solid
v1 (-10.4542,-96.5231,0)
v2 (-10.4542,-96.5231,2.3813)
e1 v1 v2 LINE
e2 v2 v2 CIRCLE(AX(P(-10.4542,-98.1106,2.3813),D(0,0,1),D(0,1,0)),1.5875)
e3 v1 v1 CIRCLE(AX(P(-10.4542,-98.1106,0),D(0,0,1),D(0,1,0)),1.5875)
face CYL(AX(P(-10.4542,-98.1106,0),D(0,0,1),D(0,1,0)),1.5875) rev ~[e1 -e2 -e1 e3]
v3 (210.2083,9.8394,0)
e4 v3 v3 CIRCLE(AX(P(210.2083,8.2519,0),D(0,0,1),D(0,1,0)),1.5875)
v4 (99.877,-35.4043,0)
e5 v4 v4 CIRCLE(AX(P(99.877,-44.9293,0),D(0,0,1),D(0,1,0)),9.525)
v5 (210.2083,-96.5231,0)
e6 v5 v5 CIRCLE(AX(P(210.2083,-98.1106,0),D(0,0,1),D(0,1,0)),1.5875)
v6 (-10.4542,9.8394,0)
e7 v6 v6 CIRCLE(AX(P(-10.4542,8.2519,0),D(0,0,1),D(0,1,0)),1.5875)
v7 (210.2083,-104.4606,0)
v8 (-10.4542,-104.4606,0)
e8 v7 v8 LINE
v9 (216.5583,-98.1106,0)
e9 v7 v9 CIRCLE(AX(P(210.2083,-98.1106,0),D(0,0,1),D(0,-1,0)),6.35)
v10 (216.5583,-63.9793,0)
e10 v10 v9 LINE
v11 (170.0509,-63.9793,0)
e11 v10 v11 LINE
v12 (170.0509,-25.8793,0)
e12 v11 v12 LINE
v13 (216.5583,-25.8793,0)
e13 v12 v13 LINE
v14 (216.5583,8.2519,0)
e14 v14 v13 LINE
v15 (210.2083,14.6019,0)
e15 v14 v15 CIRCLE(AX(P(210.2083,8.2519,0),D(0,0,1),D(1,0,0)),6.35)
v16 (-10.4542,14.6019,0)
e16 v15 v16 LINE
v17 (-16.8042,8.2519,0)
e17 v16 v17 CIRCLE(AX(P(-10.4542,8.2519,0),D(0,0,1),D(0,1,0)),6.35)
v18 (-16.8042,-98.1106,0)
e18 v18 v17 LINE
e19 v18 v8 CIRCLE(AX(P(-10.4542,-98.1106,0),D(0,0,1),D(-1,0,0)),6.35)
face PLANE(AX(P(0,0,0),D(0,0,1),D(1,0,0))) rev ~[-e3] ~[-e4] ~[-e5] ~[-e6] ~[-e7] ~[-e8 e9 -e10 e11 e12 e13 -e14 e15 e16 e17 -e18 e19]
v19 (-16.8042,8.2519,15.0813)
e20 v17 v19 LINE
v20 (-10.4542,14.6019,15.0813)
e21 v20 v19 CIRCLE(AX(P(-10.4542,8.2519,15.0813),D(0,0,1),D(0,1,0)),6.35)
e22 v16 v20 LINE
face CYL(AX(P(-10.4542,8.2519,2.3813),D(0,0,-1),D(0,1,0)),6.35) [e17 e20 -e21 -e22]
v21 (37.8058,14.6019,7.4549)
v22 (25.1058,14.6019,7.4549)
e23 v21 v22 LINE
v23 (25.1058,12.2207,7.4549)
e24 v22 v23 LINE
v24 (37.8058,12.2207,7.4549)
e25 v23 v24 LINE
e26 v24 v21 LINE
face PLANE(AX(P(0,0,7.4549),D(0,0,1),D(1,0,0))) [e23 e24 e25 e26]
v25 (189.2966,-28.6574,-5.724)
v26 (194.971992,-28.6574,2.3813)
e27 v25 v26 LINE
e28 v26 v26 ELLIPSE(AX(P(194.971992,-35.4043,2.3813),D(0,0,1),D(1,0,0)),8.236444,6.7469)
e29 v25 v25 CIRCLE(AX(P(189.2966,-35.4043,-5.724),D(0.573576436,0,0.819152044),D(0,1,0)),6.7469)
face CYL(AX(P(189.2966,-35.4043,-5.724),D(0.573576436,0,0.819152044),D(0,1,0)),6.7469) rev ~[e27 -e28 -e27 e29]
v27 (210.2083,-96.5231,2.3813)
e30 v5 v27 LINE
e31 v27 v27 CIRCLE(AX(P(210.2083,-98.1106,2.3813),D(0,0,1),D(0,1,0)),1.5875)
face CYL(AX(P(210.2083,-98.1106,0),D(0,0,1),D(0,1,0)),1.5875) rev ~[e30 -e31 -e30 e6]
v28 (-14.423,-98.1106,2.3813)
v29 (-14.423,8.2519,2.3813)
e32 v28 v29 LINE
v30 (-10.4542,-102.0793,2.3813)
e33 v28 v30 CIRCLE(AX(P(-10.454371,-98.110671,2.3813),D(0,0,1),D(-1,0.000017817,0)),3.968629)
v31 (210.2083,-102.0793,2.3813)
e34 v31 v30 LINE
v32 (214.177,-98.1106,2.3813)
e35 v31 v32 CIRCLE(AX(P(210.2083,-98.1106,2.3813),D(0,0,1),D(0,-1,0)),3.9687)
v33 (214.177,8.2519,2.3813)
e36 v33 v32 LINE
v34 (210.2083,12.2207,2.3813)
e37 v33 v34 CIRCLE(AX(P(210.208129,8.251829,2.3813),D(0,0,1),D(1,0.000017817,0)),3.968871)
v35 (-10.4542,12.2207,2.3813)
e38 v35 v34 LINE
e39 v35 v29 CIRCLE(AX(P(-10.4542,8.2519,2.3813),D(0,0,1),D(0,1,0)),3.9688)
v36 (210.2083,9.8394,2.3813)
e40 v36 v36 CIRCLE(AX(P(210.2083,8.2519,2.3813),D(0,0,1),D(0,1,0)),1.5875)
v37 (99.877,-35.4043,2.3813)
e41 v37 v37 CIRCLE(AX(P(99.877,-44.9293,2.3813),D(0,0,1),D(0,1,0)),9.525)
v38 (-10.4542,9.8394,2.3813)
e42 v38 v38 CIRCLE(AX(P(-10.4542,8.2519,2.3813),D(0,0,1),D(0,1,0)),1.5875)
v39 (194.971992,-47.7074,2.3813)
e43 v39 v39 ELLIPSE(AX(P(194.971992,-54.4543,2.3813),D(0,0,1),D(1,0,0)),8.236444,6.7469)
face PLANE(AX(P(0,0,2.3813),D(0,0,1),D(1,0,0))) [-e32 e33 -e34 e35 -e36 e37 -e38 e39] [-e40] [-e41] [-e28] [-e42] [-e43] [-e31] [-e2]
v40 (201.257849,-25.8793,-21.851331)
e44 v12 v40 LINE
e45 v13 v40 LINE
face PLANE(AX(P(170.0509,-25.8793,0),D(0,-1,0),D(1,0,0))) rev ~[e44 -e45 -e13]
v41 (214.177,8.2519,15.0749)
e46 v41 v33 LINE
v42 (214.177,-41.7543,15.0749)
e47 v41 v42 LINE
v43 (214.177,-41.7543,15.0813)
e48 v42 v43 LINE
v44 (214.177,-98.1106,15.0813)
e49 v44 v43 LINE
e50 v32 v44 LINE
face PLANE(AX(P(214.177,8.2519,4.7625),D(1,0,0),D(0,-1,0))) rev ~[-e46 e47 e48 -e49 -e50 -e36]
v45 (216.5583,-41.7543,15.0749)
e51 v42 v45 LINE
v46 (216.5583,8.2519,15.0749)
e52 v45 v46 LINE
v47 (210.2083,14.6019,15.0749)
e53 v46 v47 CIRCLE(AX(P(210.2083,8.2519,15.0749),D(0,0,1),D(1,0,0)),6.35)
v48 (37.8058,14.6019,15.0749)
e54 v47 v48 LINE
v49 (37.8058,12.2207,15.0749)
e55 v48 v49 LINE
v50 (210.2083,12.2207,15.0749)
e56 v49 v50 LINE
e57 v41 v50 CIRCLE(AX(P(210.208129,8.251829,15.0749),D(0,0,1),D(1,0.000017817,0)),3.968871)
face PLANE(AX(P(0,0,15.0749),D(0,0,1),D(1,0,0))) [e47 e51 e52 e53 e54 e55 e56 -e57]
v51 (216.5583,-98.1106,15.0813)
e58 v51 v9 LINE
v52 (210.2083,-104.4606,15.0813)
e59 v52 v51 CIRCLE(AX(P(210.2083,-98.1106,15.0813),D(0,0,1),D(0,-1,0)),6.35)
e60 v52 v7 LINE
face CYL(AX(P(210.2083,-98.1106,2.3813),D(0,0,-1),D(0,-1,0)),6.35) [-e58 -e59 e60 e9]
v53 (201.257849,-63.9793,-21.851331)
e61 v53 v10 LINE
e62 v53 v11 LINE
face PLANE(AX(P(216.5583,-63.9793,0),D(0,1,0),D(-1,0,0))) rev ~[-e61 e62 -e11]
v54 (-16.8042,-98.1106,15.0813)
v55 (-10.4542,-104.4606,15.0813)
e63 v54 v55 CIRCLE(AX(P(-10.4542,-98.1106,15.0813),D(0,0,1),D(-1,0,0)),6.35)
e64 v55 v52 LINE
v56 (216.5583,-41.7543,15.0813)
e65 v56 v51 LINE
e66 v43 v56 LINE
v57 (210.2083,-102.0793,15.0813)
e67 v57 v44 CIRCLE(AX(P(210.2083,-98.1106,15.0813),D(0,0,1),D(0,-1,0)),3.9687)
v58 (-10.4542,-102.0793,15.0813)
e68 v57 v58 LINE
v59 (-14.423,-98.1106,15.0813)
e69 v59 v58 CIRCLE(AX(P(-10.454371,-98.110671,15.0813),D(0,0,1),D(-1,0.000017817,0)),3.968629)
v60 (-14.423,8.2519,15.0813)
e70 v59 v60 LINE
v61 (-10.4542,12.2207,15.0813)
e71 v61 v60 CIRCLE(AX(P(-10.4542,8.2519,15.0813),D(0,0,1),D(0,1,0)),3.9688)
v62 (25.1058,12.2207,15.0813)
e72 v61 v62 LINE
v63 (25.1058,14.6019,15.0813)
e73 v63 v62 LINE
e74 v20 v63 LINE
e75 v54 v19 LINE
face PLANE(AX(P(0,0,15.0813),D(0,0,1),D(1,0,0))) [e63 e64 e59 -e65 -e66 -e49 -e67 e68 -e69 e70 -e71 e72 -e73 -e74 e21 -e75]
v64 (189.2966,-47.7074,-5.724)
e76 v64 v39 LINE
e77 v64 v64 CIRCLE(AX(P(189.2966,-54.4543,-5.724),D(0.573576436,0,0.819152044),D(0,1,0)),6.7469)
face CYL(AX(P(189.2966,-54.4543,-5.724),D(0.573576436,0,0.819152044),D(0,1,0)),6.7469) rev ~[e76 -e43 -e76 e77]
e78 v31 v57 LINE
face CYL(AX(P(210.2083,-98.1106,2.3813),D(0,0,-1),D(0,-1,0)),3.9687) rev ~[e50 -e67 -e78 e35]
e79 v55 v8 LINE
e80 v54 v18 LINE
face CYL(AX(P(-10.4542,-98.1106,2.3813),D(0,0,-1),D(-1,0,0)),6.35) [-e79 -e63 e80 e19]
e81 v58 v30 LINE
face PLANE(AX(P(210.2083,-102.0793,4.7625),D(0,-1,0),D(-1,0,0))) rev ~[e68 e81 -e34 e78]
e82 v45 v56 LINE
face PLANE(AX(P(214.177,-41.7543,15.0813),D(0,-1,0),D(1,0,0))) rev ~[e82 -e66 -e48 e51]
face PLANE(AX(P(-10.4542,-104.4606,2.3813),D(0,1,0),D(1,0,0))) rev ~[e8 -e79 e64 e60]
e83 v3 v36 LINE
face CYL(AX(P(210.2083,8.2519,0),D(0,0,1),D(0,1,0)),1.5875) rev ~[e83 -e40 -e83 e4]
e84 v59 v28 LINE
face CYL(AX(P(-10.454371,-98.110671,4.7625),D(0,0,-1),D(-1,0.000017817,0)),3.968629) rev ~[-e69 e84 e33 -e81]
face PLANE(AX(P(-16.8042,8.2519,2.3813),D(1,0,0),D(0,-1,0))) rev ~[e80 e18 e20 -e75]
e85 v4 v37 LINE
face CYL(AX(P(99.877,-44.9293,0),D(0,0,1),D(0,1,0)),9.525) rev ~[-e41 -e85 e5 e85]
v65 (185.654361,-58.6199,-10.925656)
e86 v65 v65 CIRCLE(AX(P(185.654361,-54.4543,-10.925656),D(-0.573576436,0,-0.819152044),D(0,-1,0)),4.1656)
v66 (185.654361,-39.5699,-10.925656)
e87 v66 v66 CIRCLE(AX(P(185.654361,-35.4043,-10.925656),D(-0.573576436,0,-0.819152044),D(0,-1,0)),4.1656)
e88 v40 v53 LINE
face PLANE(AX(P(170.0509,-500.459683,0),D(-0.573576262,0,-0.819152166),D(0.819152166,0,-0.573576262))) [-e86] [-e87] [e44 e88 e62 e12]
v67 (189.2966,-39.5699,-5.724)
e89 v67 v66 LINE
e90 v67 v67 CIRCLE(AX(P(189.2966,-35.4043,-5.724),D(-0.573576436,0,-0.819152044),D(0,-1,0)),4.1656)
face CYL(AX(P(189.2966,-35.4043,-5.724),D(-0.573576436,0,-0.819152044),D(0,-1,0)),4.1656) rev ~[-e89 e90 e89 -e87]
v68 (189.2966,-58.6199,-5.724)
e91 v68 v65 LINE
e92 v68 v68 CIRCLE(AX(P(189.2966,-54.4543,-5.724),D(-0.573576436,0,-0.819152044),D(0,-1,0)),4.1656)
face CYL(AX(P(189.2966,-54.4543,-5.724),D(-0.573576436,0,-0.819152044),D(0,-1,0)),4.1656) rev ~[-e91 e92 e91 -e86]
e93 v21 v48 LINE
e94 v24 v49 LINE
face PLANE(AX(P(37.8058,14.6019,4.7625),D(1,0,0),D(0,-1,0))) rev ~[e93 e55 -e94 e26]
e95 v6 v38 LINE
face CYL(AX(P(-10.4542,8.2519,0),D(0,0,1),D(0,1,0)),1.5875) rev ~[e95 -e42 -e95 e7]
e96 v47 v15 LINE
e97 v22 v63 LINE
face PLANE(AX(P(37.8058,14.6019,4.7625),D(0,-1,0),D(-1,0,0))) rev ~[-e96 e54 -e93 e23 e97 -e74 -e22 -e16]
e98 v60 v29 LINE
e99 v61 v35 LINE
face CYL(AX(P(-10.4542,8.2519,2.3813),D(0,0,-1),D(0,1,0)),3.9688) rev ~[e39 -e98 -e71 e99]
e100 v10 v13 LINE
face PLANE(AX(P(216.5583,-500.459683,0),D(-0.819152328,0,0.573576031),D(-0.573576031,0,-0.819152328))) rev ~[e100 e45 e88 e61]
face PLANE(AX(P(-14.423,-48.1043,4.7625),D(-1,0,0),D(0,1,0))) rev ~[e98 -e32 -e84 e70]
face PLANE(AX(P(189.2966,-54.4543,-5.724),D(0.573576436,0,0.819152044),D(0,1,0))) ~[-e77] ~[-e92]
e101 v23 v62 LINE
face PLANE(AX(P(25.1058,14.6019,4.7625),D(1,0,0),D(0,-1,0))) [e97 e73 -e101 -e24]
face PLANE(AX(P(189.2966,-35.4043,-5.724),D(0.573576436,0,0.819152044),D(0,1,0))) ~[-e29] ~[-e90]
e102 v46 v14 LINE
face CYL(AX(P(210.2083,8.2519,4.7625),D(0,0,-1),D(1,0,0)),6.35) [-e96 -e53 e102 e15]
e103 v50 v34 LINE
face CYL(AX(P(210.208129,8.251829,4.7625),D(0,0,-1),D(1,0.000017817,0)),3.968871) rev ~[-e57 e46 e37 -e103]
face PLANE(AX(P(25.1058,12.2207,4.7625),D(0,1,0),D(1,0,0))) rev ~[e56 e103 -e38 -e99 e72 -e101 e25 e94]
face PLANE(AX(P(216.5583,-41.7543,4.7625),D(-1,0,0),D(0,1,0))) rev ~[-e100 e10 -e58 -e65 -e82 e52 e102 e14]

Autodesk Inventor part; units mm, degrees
ref_plane "YZ Plane" through (0, 0, 0) normal (1, 0, 0) x (0, 1, 0)
ref_plane "XZ Plane" through (0, 0, 0) normal (0, 1, 0) x (-1, 0, 0)
sketch "Sketch1" plane through (0, 0, 0) normal (0, 0, 1) x (1, 0, 0)
  line L0 (-10.4542, 14.6019) -> (210.2083, 14.6019)
  line L1 (216.5583, 8.2519) -> (216.5583, -98.1106)
  line L2 (210.2083, -104.4606) -> (-10.4542, -104.4606)
  line L3 (-16.8042, -98.1106) -> (-16.8042, 8.2519)
  line L4 (99.877, 12.2207) -> (-10.4542, 12.2207)
  line L5 (-14.423, 8.2519) -> (-14.423, -44.9293)
  line L6 (99.877, 12.2207) -> (210.2083, 12.2207)
  line L7 (214.177, 8.2519) -> (214.177, -44.9293)
  line L8 (99.877, -102.0793) -> (210.2083, -102.0793)
  line L9 (214.177, -98.1106) -> (214.177, -44.9293)
  line L10 (99.877, -102.0793) -> (-10.4542, -102.0793)
  line L11 (-14.423, -98.1106) -> (-14.423, -44.9293)
  arc A0 (-10.4542, 14.6019) -> (-16.8042, 8.2519) centre (-10.4542, 8.2519) ccw
  arc A1 (216.5583, 8.2519) -> (210.2083, 14.6019) centre (210.2083, 8.2519) ccw
  arc A2 (210.2083, -104.4606) -> (216.5583, -98.1106) centre (210.2083, -98.1106) ccw
  arc A3 (-16.8042, -98.1106) -> (-10.4542, -104.4606) centre (-10.4542, -98.1106) ccw
  arc A4 (-10.4542, 12.2207) -> (-14.423, 8.2519) centre (-10.4542, 8.2519) ccw
  arc A5 (214.177, 8.2519) -> (210.2083, 12.2207) centre (210.2083, 8.2519) ccw
  arc A6 (210.2083, -102.0793) -> (214.177, -98.1106) centre (210.2083, -98.1106) ccw
  arc A7 (-14.423, -98.1106) -> (-10.4542, -102.0793) centre (-10.4542, -98.1106) ccw
  point P0 (0, 0)
  point P1 (-16.8042, 14.6019)
  point P2 (216.5583, -104.4606)
  point P3 (216.5583, 14.6019)
  point P4 (-16.8042, -104.4606)
  dimension "d0" = 233.3625
  dimension "d1" = 119.0625
  dimension "d9" = 6.35
  dimension "d10" = 3.9688
extrude "Extrusion1" add sketch "Sketch1" along normal blind 2.3813 contours L0 A1 L1 A2 L2 A3 L3 A0 | L6 A5 L7 L9 A6 L8 L10 A7 L11 L5 A4 L4
sketch "Sketch2" plane through (0, 0, 2.3813) normal (0, 0, 1) x (1, 0, 0)
  line L0 (210.2083, 14.6019) -> (-10.4542, 14.6019) projected
  arc A0 (-10.4542, 14.6019) -> (-16.8042, 8.2519) centre (-10.4542, 8.2519) ccw projected
  line L1 (-16.8042, 8.2519) -> (-16.8042, -98.1106) projected
  arc A1 (-16.8042, -98.1106) -> (-10.4542, -104.4606) centre (-10.4542, -98.1106) ccw projected
  line L2 (-10.4542, -104.4606) -> (210.2083, -104.4606) projected
  arc A2 (210.2083, -104.4606) -> (216.5583, -98.1106) centre (210.2083, -98.1106) ccw projected
  line L3 (216.5583, -98.1106) -> (216.5583, 8.2519) projected
  arc A3 (216.5583, 8.2519) -> (210.2083, 14.6019) centre (210.2083, 8.2519) ccw projected
  line L4 (99.877, 12.2207) -> (-10.4542, 12.2207)
  line L5 (-14.423, 8.2519) -> (-14.423, -44.9293)
  line L6 (99.877, -102.0793) -> (-10.4542, -102.0793)
  line L7 (-14.423, -98.1106) -> (-14.423, -44.9293)
  line L8 (99.877, -102.0793) -> (210.2083, -102.0793)
  line L9 (214.177, -98.1106) -> (214.177, -44.9293)
  line L10 (99.877, 12.2207) -> (210.2083, 12.2207)
  line L11 (214.177, 8.2519) -> (214.177, -44.9293)
  arc A4 (-10.4542, 12.2207) -> (-14.423, 8.2519) centre (-10.4542, 8.2519) ccw
  arc A5 (214.177, 8.2519) -> (210.2083, 12.2207) centre (210.2083, 8.2519) ccw
  arc A6 (210.2083, -102.0793) -> (214.177, -98.1106) centre (210.2083, -98.1106) ccw
  arc A7 (-14.423, -98.1106) -> (-10.4542, -102.0793) centre (-10.4542, -98.1106) ccw
  point P0 (0, 0)
  dimension "d15" = 3.9688
extrude "Extrusion2" add sketch "Sketch2" along normal blind 2.3813
sketch "Sketch3" plane through (0, 0, 4.7625) normal (0, 0, 1) x (1, 0, 0)
  arc A0 (-10.4542, 12.2207) -> (-14.423, 8.2519) centre (-10.4542, 8.2519) ccw projected
  arc A1 (214.177, 8.2519) -> (210.2083, 12.2207) centre (210.2083, 8.2519) ccw projected
  line L0 (214.177, 8.2519) -> (214.177, -98.1106) projected
  arc A2 (210.2083, -102.0793) -> (214.177, -98.1106) centre (210.2083, -98.1106) ccw projected
  line L1 (210.2083, -102.0793) -> (-10.4542, -102.0793) projected
  arc A3 (-14.423, -98.1106) -> (-10.4542, -102.0793) centre (-10.4542, -98.1106) ccw projected
  line L2 (-14.423, -98.1106) -> (-14.423, 8.2519) projected
  arc A4 (-10.4542, 14.6019) -> (-16.8042, 8.2519) centre (-10.4542, 8.2519) ccw projected
  line L3 (-16.8042, 8.2519) -> (-16.8042, -98.1106) projected
  arc A5 (-16.8042, -98.1106) -> (-10.4542, -104.4606) centre (-10.4542, -98.1106) ccw projected
  line L4 (-10.4542, -104.4606) -> (210.2083, -104.4606) projected
  arc A6 (210.2083, -104.4606) -> (216.5583, -98.1106) centre (210.2083, -98.1106) ccw projected
  line L5 (216.5583, -98.1106) -> (216.5583, 8.2519) projected
  arc A7 (216.5583, 8.2519) -> (210.2083, 14.6019) centre (210.2083, 8.2519) ccw projected
  line L6 (214.177, -44.9293) -> (214.177, -41.7543)
  line L7 (214.177, -41.7543) -> (216.5583, -41.7543)
  line L8 (216.5583, -41.7543) -> (216.5583, -44.9293)
  line L9 (216.5583, -44.9293) -> (216.5583, -48.1043)
  line L10 (216.5583, -48.1043) -> (214.177, -48.1043)
  line L11 (214.177, -48.1043) -> (214.177, -44.9293)
  line L12 (-14.423, -44.9293) -> (-14.423, -41.7543)
  line L13 (-14.423, -41.7543) -> (-16.8042, -41.7543)
  line L14 (-16.8042, -41.7543) -> (-16.8042, -44.9293)
  line L15 (-16.8042, -44.9293) -> (-16.8042, -48.1043)
  line L16 (-16.8042, -48.1043) -> (-14.423, -48.1043)
  line L17 (-14.423, -48.1043) -> (-14.423, -44.9293)
  line L18 (-10.4542, 14.6019) -> (25.1058, 14.6019)
  line L19 (25.1058, 14.6019) -> (25.1058, 12.2207)
  line L20 (37.8058, 14.6019) -> (37.8058, 12.2207)
  line L21 (-10.4542, 12.2207) -> (25.1058, 12.2207)
  line L22 (37.8058, 12.2207) -> (210.2083, 12.2207)
  line L23 (37.8058, 14.6019) -> (210.2083, 14.6019)
  point P0 (0, 0)
  dimension "d18" = 3.175
  dimension "d19" = 3.175
  dimension "d20" = 3.175
  dimension "d21" = 3.175
  dimension "d93" = 35.56
  dimension "d94" = 12.7
extrude "Extrusion3" add sketch "Sketch3" along normal blind 10.3188 contours A0 L2 L13 L3 A4 L18 L19 L21 | L2 A3 L1 A2 L0 L10 L5 A6 L4 A5 L3 L16
sketch "Sketch4" plane through (0, 0, 15.0813) normal (0, 0, 1) x (1, 0, 0)
  line L0 (214.177, -41.7543) -> (216.5583, -41.7543)
  line L1 (216.5583, -41.7543) -> (216.5583, -48.1043)
  line L2 (216.5583, -48.1043) -> (214.177, -48.1043)
  line L3 (214.177, -48.1043) -> (214.177, -41.7543)
  line L4 (-16.8042, -41.7543) -> (-14.423, -41.7543)
  line L5 (-14.423, -41.7543) -> (-14.423, -48.1043)
  line L6 (-14.423, -48.1043) -> (-16.8042, -48.1043)
  line L7 (-16.8042, -48.1043) -> (-16.8042, -41.7543)
  point P0 (0, 0)
  dimension "d24" = 2.3813
  dimension "d25" = 6.35
  dimension "d26" = 2.3813
  dimension "d27" = 6.35
extrude "Extrusion4" add sketch "Sketch4" against normal blind 7.9375
sketch "Sketch5" plane through (0, 0, 0) normal (0, 0, -1) x (-1, 0, 0)
  arc A0 (-210.2083, 14.6019) -> (-216.5583, 8.2519) centre (-210.2083, 8.2519) ccw projected
  line L0 (-210.2083, 8.2519) -> (-99.877, 8.2519)
  line L1 (-99.877, 8.2519) -> (-99.877, -44.9293)
  line L2 (-99.877, -44.9293) -> (-210.2083, -44.9293)
  line L3 (-210.2083, -44.9293) -> (-210.2083, 8.2519)
  point P0 (0, 0)
hole "Hole1" at (99.877, -44.9293, 0) direction (0, 0, 1) diameter 19.05 end through all
sketch "Sketch6" plane through (0, 0, 0) normal (0, 0, -1) x (-1, 0, 0)
  line L0 (-216.5583, 8.2519) -> (-216.5583, -98.1106) projected
  line L1 (-216.5583, -25.8793) -> (-216.5583, -63.9793)
  line L2 (-216.5583, -63.9793) -> (-170.0509, -63.9793)
  line L3 (-170.0509, -63.9793) -> (-170.0509, -25.8793)
  line L4 (-170.0509, -25.8793) -> (-216.5583, -25.8793)
  point P0 (0, 0)
  dimension "d39" = 38.1
  dimension "d43" = 46.5074
extrude "Extrusion6" add sketch "Sketch6" along normal blind 38.1
sketch "Sketch8" plane through (170.0509, -25.8793, 0) normal (0, 1, 0) x (1, 0, 0)
  line L0 (46.5074, 0) -> (13.7658, 46.7599)
  point P0 (46.5074, 38.1)
  point P1 (0, 38.1)
  point P2 (-170.0509, 0)
split body "Split1" sketch "Sketch8" result one side removed curves L0 removed pieces at (208.0752, -38.5793, -12.9868)
sketch "Sketch9" plane through (170.0509, -25.8793, 0) normal (0, 1, 0) x (1, 0, 0)
  line L0 (0, 0) -> (64.0379, 44.8398)
  line L1 (0, 0) -> (78.1758, 0) construction
  line L2 (0, 0) -> (0, 38.1)
  point P0 (-170.0509, 0)
  dimension "d48" = 35
split body "Split2" sketch "Sketch9" result one side removed curves L2 L0 removed pieces at (170.5509, -51.2793, -12.7)
ref_plane "Work Plane1" through (204.9, -63.9793, -16.6497) normal (-0.5735764, 0, -0.819152) x (-0.819152, 0, 0.5735764)
sketch "Sketch10" plane through (204.9, -63.9793, -16.6497) normal (-0.5735764, 0, -0.819152) x (-0.819152, 0, 0.5735764)
  line L0 (0, 38.1) -> (38.0966, 38.1) projected
  line L1 (0, 0) -> (0, 38.1) projected
  line L2 (38.0966, 0) -> (0, 0) projected
  line L3 (38.0966, 38.1) -> (38.0966, 0) projected
  line L4 (19.0483, 38.1) -> (19.0483, 28.575)
  line L5 (19.0483, 0) -> (19.0483, 9.525)
  point P0 (177.3942, 63.9793)
  dimension "d50" = 9.525
  dimension "d51" = 9.525
hole "Hole2" at (189.2966, -35.4043, -5.724) at (189.2966, -54.4543, -5.724) direction (0.5735764, 0, 0.819152) diameter 13.4938 end through all
sketch "Sketch11" plane through (204.9, -63.9793, -16.6497) normal (-0.5735764, 0, -0.819152) x (-0.819152, 0, 0.5735764)
  line L0 (0, 38.1) -> (38.0966, 38.1) projected
  line L1 (0, 0) -> (0, 38.1) projected
  line L2 (38.0966, 0) -> (0, 0) projected
  line L3 (38.0966, 38.1) -> (38.0966, 0) projected
  line L4 (19.0483, 38.1) -> (19.0483, 28.575)
  line L5 (19.0483, 0) -> (19.0483, 9.525)
  point P0 (177.3942, 63.9793)
  dimension "d59" = 9.525
  dimension "d60" = 9.525
hole "Hole3" at (189.2966, -35.4043, -5.724) at (189.2966, -54.4543, -5.724) direction (-0.5735764, 0, -0.819152) diameter 8.3312 end through all
sketch "Sketch12" plane through (0, 0, 4.7625) normal (0, 0, 1) x (1, 0, 0)
  line L0 (216.5583, -41.7543) -> (214.177, -41.7543) projected
  line L1 (214.177, 8.2519) -> (214.177, -48.1043) projected
  line L2 (216.5583, -41.7543) -> (214.177, -41.7543)
  line L3 (214.177, -41.7543) -> (214.177, -48.1043)
  line L4 (214.177, -48.1043) -> (216.5583, -48.1043)
  line L5 (216.5583, -48.1043) -> (216.5583, -41.7543)
  point P0 (0, 0)
extrude "Extrusion7" add sketch "Sketch12" along normal blind 2.3876
sketch "Sketch13" plane through (0, 0, 4.7625) normal (0, 0, 1) x (1, 0, 0)
  line L0 (-14.423, -41.7543) -> (-16.8042, -41.7543) projected
  line L1 (-16.8042, -41.7543) -> (-16.8042, -48.1043) projected
  line L2 (-14.423, -41.7543) -> (-16.8042, -41.7543)
  line L3 (-16.8042, -41.7543) -> (-16.8042, -48.1043)
  line L4 (-16.8042, -48.1043) -> (-14.423, -48.1043)
  line L5 (-14.423, -48.1043) -> (-14.423, -41.7543)
  point P0 (0, 0)
extrude "Extrusion8" add sketch "Sketch13" along normal blind 2.3876
sketch "Sketch16" plane through (0, 0, 0) normal (0, 0, -1) x (-1, 0, 0)
  arc A0 (-210.2083, 14.6019) -> (-216.5583, 8.2519) centre (-210.2083, 8.2519) ccw projected
  arc A1 (-216.5583, -98.1106) -> (-210.2083, -104.4606) centre (-210.2083, -98.1106) ccw projected
  arc A2 (10.4542, -104.4606) -> (16.8042, -98.1106) centre (10.4542, -98.1106) ccw projected
  arc A3 (16.8042, 8.2519) -> (10.4542, 14.6019) centre (10.4542, 8.2519) ccw projected
  point P0 (0, 0)
hole "Hole6" at (210.2083, 8.2519, 0) at (-10.4542, 8.2519, 0) at (-10.4542, -98.1106, 0) at (210.2083, -98.1106, 0) direction (0, 0, 1) diameter 3.175 end through all
sketch "Sketch17" plane through (0, 0, 4.7625) normal (0, 0, 1) x (1, 0, 0)
  line L0 (214.177, -41.7543) -> (216.5583, -41.7543) projected
  line L1 (216.5583, -41.7543) -> (216.5583, 8.2519) projected
  arc A0 (216.5583, 8.2519) -> (210.2083, 14.6019) centre (210.2083, 8.2519) ccw projected
  line L2 (210.2083, 14.6019) -> (25.1058, 14.6019) projected
  line L3 (25.1058, 12.2207) -> (210.2083, 12.2207) projected
  arc A1 (214.177, 8.2519) -> (210.2083, 12.2207) centre (210.2083, 8.2519) ccw projected
  line L4 (214.177, 8.2519) -> (214.177, -41.7543) projected
  line L5 (25.1058, 14.6019) -> (37.8058, 14.6019)
  line L6 (37.8058, 14.6019) -> (37.8058, 12.2207)
  point P0 (0, 0)
  dimension "d95" = 12.7
extrude "Extrusion9" add sketch "Sketch17" along normal blind 10.3124
sketch "Sketch18" plane through (0, 0, 4.7625) normal (0, 0, 1) x (1, 0, 0)
  line L0 (37.8058, 12.2207) -> (37.8058, 14.6019) projected
  line L1 (37.8058, 14.6019) -> (25.1058, 14.6019) projected
  line L2 (25.1058, 14.6019) -> (25.1058, 12.2207) projected
  line L3 (25.1058, 12.2207) -> (37.8058, 12.2207) projected
  point P0 (0, 0)
extrude "Extrusion10" add sketch "Sketch18" along normal blind 2.6924
properties part number "Slave Tablet Enclosure"
